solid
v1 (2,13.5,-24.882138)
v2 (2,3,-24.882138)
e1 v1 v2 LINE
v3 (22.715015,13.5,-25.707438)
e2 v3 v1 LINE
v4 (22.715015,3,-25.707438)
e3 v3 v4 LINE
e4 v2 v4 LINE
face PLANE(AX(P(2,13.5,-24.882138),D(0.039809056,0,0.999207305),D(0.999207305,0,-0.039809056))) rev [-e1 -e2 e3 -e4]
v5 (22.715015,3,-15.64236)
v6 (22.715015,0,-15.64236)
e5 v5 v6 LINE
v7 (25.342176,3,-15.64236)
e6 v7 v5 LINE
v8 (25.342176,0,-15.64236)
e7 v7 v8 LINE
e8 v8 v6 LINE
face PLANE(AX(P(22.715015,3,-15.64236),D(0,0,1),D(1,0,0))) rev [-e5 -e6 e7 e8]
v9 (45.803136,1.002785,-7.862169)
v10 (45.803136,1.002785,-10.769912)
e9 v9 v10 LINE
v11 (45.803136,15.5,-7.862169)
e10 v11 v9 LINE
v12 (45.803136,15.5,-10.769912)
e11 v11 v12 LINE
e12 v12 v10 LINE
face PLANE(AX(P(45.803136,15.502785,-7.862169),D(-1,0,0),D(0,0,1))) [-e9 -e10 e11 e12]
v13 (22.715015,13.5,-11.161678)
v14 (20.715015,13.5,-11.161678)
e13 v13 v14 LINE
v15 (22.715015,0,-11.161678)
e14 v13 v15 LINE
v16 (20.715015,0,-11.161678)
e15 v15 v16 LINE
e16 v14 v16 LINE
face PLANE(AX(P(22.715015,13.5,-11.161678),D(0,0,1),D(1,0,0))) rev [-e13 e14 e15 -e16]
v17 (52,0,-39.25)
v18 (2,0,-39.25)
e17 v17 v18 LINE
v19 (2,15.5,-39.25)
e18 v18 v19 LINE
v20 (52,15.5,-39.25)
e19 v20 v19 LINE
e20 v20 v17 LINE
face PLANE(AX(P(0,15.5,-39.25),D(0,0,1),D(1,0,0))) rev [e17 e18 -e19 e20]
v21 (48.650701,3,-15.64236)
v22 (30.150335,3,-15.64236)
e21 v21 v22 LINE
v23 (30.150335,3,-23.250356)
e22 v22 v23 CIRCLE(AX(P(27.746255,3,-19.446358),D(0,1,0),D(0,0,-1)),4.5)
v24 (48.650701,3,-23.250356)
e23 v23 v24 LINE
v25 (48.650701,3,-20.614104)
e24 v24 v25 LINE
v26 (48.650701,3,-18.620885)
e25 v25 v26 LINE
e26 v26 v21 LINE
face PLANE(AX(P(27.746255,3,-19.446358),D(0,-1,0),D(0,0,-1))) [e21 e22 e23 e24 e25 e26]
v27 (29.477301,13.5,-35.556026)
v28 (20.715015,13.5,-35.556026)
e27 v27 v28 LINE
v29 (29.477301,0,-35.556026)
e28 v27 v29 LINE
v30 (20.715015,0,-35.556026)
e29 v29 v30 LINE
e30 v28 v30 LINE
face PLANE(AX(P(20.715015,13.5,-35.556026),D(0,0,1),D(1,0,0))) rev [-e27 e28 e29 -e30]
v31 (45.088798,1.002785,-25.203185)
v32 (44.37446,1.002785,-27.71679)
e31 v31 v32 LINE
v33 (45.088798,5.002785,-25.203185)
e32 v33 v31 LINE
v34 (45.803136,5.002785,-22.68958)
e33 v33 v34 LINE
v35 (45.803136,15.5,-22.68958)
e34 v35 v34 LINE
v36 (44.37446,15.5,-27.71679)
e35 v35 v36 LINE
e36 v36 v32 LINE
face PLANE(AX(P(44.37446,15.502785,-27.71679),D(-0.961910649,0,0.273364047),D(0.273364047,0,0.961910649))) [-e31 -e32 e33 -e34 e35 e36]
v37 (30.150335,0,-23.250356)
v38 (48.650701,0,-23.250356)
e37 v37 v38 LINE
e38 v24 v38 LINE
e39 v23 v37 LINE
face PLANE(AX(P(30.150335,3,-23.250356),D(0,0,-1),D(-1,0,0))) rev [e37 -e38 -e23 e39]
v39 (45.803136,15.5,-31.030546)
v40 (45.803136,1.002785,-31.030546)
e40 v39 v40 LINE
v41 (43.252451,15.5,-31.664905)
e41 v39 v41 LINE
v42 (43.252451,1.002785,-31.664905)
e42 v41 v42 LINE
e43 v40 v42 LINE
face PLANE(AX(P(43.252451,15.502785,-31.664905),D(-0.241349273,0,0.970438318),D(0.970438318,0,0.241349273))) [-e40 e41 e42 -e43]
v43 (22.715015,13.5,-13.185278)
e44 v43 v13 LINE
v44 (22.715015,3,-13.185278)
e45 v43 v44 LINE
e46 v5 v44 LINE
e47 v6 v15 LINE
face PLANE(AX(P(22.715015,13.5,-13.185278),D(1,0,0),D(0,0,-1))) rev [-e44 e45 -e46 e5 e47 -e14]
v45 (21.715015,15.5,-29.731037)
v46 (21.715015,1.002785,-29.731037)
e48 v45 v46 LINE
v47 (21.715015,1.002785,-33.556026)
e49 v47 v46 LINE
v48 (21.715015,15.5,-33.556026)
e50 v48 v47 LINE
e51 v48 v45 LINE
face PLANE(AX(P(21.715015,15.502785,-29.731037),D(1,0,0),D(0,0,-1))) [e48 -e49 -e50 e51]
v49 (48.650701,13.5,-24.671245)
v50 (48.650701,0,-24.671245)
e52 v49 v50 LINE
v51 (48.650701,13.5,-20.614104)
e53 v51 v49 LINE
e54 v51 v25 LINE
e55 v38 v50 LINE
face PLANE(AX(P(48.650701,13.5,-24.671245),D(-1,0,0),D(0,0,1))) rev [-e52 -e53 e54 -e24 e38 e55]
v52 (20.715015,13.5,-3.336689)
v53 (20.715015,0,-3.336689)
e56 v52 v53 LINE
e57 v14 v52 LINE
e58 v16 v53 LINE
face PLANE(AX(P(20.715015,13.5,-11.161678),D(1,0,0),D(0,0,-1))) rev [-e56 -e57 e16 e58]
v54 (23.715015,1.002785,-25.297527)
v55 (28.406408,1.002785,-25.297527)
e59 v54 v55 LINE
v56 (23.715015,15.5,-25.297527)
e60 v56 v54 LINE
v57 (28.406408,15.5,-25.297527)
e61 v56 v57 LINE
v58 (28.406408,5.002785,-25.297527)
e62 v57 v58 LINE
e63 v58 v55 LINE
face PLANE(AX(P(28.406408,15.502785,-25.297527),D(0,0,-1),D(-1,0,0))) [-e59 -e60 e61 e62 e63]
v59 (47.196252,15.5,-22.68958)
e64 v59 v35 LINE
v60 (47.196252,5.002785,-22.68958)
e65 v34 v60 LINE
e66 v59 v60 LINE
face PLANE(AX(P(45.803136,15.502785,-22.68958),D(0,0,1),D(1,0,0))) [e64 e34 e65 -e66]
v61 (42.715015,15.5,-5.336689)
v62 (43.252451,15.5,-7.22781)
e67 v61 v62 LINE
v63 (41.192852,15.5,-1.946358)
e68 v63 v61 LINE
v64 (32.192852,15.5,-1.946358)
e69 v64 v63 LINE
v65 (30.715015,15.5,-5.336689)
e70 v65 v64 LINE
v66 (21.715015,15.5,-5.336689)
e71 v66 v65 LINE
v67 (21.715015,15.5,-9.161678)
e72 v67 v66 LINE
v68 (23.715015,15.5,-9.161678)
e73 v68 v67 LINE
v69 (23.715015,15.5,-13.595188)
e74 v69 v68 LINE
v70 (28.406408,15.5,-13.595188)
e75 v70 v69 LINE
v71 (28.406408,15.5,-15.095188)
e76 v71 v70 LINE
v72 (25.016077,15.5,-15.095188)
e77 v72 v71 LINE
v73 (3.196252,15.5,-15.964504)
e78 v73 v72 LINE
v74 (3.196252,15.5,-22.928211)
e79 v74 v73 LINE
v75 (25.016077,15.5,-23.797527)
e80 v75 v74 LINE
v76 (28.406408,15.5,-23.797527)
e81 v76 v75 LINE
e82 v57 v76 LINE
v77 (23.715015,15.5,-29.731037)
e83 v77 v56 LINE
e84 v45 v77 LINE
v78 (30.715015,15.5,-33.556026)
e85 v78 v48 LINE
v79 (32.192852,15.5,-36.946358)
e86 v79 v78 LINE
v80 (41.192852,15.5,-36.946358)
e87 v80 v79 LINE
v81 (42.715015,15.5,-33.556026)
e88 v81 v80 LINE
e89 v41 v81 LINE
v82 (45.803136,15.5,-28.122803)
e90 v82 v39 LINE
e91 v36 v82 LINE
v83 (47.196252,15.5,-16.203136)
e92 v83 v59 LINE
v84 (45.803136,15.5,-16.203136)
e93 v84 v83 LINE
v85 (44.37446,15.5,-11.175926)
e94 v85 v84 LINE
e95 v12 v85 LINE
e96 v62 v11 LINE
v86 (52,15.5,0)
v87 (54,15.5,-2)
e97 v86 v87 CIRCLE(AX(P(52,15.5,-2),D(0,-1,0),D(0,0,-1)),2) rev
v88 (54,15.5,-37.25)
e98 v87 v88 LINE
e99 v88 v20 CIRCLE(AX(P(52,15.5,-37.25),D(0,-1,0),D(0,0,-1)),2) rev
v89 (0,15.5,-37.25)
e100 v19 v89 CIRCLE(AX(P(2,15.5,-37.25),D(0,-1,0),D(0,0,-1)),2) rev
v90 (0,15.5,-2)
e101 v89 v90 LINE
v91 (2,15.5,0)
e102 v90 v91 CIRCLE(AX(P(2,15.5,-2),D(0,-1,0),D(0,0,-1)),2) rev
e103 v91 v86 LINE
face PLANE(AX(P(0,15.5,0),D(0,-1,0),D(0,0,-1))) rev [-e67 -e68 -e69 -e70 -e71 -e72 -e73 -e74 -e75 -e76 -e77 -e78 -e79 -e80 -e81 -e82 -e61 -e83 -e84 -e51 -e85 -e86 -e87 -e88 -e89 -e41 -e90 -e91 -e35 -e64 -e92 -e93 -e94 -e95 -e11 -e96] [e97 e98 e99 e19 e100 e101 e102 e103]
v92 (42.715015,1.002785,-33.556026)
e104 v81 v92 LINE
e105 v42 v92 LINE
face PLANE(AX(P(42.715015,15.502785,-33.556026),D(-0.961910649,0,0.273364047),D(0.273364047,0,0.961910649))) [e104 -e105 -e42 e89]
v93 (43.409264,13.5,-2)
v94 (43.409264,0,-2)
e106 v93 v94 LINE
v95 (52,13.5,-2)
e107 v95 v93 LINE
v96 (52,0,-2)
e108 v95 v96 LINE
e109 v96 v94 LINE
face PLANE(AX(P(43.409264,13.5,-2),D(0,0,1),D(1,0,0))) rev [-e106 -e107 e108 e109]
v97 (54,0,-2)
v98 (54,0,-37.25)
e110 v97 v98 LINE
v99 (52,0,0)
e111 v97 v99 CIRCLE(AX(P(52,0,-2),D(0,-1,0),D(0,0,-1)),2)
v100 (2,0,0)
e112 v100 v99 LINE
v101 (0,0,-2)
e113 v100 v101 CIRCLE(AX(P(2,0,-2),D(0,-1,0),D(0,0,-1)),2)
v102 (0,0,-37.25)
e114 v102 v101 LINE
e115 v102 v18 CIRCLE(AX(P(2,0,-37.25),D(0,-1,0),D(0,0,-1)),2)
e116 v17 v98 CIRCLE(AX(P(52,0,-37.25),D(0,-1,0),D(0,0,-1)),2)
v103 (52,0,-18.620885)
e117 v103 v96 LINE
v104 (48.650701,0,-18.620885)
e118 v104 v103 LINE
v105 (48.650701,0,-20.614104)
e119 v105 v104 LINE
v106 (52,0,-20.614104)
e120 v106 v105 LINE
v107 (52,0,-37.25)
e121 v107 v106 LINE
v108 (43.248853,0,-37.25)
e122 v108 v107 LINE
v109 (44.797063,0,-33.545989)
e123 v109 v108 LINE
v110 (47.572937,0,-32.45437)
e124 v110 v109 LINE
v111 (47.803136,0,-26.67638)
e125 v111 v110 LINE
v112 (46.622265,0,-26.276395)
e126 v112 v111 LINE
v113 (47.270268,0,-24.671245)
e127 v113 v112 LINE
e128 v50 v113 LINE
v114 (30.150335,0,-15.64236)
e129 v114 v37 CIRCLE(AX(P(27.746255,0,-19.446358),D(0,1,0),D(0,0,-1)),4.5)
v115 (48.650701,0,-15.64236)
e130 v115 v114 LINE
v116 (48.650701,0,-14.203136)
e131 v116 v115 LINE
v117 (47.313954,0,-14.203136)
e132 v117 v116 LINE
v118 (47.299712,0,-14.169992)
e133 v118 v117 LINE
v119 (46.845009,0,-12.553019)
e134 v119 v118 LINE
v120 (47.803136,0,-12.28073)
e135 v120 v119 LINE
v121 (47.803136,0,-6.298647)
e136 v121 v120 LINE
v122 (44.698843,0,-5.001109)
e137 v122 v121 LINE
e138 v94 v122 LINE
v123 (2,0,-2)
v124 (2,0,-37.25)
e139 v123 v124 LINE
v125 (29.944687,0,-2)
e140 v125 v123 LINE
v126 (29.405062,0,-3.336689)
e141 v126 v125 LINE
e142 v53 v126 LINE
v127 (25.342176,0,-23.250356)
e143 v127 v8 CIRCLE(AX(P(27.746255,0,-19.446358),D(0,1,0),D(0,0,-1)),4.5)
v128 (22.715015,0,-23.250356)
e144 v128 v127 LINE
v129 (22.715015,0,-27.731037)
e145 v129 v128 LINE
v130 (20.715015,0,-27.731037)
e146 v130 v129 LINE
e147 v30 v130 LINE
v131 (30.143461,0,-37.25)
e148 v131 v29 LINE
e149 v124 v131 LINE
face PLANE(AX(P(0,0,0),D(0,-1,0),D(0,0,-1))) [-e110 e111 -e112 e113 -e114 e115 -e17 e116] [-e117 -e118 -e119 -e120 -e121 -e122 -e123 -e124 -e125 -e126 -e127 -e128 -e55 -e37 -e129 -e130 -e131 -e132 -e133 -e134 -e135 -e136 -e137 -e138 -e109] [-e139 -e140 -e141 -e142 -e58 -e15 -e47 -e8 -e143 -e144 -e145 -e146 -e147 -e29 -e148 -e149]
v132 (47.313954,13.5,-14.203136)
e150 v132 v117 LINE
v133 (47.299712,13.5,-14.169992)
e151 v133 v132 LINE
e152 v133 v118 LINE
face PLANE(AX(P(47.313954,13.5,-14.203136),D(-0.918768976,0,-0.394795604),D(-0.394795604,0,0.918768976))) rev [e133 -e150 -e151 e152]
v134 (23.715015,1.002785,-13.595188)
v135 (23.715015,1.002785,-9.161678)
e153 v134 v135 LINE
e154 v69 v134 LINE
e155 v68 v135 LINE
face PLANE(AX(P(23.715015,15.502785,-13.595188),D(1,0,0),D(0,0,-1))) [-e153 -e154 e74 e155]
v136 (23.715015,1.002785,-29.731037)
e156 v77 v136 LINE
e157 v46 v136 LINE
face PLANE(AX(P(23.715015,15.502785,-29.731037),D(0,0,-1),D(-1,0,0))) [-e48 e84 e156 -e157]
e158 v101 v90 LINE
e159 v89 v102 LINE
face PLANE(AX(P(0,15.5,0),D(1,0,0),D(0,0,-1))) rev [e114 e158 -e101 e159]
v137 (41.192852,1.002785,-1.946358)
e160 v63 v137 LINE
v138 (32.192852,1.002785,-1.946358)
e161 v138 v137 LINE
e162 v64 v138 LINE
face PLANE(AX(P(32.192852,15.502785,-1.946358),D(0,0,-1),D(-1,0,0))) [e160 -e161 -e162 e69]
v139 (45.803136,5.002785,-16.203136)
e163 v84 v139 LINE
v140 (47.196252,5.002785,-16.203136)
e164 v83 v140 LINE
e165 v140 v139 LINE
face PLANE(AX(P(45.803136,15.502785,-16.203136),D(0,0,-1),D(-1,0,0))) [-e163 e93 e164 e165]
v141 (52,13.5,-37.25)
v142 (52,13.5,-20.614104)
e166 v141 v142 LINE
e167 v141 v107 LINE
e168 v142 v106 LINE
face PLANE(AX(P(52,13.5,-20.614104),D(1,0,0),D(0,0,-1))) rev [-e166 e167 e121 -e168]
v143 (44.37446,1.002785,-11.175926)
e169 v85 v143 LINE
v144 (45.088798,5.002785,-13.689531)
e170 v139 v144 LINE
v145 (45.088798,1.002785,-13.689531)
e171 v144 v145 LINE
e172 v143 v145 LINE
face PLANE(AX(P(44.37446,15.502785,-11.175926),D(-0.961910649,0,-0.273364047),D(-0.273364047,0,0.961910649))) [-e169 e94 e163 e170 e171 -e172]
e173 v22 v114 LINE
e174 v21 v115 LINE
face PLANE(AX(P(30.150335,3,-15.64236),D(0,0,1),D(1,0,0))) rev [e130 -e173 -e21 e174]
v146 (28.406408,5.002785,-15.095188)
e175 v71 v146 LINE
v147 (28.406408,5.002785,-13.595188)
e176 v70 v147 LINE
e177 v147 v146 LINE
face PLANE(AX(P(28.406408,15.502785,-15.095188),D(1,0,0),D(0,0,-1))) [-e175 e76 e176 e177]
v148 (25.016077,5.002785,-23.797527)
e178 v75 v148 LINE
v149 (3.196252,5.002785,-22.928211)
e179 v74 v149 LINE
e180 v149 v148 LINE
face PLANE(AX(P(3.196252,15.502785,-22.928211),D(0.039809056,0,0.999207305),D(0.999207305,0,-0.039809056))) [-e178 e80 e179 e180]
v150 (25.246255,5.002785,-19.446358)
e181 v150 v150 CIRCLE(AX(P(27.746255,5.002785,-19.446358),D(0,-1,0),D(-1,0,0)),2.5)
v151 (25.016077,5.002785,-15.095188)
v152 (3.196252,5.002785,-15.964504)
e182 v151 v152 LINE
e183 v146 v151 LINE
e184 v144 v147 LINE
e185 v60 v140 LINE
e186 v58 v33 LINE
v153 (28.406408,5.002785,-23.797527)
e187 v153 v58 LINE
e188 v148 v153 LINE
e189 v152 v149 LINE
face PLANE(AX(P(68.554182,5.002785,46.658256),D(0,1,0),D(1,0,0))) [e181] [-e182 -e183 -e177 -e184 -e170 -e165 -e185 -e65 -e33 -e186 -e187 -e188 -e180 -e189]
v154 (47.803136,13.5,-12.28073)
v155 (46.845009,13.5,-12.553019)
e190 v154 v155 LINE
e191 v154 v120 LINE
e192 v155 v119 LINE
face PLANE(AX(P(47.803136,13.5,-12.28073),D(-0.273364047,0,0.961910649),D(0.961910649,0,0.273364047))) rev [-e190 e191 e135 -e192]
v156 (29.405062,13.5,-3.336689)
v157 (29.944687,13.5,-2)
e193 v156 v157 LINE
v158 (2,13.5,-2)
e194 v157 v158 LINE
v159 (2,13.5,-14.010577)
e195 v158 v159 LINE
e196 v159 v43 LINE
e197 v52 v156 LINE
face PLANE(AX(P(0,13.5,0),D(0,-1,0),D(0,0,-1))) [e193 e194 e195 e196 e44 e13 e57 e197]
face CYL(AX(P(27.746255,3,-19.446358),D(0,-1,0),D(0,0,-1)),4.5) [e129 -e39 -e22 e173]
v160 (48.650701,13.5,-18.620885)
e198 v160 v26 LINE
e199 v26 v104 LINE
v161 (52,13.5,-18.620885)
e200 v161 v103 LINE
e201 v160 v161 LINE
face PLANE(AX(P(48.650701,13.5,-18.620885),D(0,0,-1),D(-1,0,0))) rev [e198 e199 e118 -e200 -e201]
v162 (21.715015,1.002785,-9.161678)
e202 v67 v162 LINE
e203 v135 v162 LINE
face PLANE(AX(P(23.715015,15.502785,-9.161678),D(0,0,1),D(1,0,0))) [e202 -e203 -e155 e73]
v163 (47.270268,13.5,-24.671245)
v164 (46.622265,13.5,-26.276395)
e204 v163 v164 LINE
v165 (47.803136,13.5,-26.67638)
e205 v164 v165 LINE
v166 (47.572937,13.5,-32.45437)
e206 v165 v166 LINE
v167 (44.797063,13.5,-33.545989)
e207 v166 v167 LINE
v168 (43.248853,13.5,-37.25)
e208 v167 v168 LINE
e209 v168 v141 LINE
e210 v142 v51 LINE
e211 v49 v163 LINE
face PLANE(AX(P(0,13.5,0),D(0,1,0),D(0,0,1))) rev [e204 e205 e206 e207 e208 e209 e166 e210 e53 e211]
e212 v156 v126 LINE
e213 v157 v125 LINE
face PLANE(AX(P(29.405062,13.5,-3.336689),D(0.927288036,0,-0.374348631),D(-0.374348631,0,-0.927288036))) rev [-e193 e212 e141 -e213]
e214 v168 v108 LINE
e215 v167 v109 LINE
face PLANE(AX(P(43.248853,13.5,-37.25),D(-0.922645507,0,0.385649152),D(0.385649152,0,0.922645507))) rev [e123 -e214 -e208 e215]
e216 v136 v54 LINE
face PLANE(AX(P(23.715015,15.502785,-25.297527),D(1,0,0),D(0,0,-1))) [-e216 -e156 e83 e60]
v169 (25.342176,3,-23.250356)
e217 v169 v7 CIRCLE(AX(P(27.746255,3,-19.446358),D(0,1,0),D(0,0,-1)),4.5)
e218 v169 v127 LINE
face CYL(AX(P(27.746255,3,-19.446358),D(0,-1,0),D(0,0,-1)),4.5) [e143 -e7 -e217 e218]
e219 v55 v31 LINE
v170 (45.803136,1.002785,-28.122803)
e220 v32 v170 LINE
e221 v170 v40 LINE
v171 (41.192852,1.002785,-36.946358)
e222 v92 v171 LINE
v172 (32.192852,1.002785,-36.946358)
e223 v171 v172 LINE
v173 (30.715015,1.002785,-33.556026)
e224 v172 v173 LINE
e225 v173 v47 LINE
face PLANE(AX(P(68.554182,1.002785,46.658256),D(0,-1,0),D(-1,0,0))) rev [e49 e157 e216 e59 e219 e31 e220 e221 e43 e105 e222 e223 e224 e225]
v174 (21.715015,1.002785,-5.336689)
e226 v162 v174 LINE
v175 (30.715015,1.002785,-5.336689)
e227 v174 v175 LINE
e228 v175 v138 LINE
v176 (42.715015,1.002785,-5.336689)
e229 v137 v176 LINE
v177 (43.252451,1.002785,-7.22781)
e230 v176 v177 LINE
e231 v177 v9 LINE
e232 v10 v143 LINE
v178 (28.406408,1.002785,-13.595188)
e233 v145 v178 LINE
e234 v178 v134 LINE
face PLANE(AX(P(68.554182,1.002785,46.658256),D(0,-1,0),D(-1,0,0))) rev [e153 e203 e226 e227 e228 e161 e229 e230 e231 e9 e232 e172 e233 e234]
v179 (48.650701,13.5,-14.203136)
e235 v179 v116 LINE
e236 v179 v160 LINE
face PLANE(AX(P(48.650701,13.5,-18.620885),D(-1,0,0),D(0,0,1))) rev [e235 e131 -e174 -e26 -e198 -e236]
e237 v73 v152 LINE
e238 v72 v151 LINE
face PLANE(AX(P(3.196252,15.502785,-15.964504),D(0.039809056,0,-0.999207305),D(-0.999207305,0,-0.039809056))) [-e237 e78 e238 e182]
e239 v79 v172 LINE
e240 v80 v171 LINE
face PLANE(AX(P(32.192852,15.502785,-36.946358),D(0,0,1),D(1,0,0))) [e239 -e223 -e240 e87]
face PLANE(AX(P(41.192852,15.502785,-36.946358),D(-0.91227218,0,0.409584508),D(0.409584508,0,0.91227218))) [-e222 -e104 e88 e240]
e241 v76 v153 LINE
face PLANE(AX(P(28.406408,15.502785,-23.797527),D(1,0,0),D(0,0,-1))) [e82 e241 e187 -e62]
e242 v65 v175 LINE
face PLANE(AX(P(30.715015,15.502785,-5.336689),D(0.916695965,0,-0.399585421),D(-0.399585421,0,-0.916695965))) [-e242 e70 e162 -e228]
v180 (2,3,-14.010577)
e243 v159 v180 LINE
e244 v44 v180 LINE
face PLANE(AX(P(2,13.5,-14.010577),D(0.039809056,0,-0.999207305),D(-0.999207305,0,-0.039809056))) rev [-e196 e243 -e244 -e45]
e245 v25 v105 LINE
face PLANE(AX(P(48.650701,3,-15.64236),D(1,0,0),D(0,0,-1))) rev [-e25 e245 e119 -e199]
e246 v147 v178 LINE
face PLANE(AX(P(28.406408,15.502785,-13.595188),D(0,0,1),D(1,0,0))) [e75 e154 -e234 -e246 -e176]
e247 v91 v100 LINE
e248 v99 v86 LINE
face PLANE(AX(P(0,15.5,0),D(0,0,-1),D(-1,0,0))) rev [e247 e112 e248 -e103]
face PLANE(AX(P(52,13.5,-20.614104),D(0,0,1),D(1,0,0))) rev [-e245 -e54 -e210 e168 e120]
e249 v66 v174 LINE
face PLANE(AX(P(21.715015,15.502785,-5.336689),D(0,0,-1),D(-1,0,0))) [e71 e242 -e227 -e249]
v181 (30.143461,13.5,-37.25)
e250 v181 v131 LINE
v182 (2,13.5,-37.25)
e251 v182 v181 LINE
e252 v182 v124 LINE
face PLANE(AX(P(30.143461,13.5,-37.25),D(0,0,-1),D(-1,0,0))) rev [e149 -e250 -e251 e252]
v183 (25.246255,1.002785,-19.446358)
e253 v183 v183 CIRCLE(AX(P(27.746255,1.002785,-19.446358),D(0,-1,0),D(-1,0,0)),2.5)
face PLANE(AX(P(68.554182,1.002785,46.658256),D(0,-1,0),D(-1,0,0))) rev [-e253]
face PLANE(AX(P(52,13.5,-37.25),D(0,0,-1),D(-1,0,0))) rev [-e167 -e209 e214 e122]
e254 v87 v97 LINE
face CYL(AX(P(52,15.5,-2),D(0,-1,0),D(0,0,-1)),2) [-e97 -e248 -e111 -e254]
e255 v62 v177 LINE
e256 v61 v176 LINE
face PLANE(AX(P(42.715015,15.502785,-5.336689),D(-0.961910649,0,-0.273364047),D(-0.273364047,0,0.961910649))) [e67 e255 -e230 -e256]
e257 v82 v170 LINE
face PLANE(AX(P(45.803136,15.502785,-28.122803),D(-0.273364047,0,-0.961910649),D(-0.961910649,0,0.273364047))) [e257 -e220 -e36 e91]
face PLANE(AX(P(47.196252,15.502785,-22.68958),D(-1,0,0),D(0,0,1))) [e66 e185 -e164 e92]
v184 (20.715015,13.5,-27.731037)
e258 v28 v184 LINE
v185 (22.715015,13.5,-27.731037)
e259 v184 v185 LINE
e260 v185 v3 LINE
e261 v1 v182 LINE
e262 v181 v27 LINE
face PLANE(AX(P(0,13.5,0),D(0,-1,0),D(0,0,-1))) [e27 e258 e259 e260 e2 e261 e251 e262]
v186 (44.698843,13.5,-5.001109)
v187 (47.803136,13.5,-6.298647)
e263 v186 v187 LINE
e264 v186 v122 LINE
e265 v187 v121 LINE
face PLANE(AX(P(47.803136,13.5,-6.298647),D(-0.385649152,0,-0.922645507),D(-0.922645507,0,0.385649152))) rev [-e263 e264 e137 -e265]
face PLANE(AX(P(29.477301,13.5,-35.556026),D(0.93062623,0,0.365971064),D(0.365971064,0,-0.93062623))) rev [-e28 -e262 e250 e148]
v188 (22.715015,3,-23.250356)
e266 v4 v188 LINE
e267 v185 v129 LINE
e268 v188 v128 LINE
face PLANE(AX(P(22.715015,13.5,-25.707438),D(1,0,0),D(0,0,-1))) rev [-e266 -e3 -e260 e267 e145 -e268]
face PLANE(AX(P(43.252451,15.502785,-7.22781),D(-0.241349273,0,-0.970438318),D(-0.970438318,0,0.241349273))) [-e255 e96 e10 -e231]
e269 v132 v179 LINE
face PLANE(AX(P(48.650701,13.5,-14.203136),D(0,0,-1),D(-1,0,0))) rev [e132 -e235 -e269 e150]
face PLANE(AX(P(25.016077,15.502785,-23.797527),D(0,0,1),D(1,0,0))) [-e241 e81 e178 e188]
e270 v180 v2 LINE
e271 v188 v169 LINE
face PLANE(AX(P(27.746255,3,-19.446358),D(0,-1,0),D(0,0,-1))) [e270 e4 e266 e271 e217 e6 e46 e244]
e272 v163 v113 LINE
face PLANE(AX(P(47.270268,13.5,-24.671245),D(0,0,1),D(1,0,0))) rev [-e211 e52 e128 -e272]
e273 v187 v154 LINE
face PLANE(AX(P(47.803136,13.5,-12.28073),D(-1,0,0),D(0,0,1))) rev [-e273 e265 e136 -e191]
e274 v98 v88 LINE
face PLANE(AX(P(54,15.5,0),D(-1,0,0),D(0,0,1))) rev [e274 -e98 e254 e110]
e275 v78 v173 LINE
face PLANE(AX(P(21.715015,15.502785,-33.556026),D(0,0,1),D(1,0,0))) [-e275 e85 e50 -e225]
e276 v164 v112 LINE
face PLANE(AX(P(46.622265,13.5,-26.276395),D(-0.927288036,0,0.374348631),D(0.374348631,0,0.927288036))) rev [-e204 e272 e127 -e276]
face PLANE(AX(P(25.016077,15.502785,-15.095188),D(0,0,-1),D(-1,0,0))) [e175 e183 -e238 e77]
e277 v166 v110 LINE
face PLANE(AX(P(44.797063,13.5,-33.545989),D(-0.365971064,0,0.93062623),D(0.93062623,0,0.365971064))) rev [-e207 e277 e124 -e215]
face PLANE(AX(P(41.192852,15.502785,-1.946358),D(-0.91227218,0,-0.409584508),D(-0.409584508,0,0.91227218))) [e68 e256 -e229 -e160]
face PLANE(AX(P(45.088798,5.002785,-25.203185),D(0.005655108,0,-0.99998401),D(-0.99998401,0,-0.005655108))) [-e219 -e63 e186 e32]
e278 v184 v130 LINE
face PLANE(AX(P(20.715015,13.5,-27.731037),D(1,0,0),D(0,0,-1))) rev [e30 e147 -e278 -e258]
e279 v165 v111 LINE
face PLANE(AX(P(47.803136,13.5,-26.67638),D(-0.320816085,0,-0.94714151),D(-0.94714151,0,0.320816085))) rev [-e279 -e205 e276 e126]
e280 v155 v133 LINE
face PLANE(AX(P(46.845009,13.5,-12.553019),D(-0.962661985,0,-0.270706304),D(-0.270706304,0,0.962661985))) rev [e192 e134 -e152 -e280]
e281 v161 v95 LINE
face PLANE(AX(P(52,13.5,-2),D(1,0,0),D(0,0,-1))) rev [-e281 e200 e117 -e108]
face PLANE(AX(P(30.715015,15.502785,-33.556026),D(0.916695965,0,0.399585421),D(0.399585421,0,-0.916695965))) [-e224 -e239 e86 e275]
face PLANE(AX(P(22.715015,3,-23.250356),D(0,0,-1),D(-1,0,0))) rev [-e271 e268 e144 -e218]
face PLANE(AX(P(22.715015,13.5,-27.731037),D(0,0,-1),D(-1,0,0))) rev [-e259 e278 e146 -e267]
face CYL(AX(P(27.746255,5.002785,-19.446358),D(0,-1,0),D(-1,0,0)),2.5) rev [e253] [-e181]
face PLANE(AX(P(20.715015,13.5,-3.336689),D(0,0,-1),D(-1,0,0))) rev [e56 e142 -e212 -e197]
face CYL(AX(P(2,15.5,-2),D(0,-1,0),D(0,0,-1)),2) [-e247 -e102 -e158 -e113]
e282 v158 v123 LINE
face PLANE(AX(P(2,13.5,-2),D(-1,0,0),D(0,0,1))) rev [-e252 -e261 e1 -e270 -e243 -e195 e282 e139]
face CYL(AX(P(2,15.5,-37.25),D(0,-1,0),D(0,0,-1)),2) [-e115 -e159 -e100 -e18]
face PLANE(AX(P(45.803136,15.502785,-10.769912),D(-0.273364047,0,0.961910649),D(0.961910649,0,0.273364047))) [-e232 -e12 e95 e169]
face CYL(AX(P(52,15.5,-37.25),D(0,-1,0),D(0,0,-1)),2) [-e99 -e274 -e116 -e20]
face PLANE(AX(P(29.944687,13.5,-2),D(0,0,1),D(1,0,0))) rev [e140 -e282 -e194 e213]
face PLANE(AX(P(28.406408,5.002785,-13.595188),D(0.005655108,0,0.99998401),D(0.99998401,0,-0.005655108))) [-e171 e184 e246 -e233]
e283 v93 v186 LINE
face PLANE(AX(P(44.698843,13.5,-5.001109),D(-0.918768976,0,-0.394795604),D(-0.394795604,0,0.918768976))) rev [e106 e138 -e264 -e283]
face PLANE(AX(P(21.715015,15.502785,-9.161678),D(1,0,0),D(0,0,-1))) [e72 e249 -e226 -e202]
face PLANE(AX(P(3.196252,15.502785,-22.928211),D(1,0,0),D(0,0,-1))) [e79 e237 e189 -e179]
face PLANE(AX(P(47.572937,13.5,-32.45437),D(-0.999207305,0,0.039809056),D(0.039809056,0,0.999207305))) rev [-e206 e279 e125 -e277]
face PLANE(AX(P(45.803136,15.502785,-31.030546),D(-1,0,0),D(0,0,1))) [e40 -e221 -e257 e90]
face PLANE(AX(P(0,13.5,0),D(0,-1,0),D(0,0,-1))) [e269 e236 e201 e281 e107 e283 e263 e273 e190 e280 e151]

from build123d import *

# Parameters (mm, degrees)
SKETCH1_W                = 54
SKETCH1_H                = 39.25
BOSS_EXTRUDE1_DEPTH      = 15.5
FILLET1_R                = 2
FILLET2_R                = 2
E_WING_START             = 8.464149768
E_WING_BLANK_DEPTH       = 10.5
E_WING_START_2           = 4.464149768
E_WING_BLANK_2_OUTLINE_R = 2.5
E_WING_BLANK_2_DEPTH     = 4
BODY_MOVE_COPY5_ANGLE    = 90
CUT_EXTRUDE1_DEPTH       = 13.5
CUT_EXTRUDE2_DEPTH       = 3


with BuildPart() as part:
    # Sketch1 → Boss-Extrude1 (new body)
    with BuildSketch(Plane(origin=(0, 0, 0), x_dir=(1, 0, 0), z_dir=(0, 1, 0))):
        with Locations((27, 19.625)):
            Rectangle(SKETCH1_W, SKETCH1_H)
    extrude(amount=BOSS_EXTRUDE1_DEPTH)

    # Fillet1
    fillet1_edges = [part.edges().sort_by_distance(p)[0] for p in [
        (0, 7.75, 0),
    ]]
    fillet(fillet1_edges, radius=FILLET1_R)

    # Fillet2
    fillet2_edges = [part.edges().sort_by_distance(p)[0] for p in [
        (0, 7.75, -39.25),
        (54, 7.75, -39.25),
        (54, 7.75, 0),
    ]]
    fillet(fillet2_edges, radius=FILLET2_R)


with BuildPart() as body_2:
    # E-Wing Blank: read off the stored shape, not the designer's step
    # E-Wing Blank outline → E-Wing Blank (new body)
    with BuildSketch(Plane(origin=(0, 0, 0), x_dir=(1, 0, 0), z_dir=(0, 1, 0)).offset(E_WING_START)):
        Polygon((76.333039674, 32.997673143), (76.333039674, 31.604556958), (82.819483769, 31.604556958), (82.819483769, 32.997673143), (87.846693693, 34.426348928), (88.252707074, 32.997673143), (91.160450403, 32.997673143), (91.794809137, 35.548358356), (93.685930379, 36.085793467), (97.076261721, 37.607956728), (97.076261721, 46.607956728), (93.685930379, 48.085793467), (93.685930379, 57.085793467), (89.860941172, 57.085793467), (89.860941172, 55.085793467), (85.427430955, 55.085793467), (85.427430955, 50.394400823), (83.927430955, 50.394400823), (83.927430955, 53.784732166), (83.058115227, 75.604556958), (76.094408216, 75.604556958), (75.225092487, 53.784732166), (75.225092487, 50.394400823), (73.725092487, 50.394400823), (73.725092487, 55.085793467), (69.29158227, 55.085793467), (69.29158227, 57.085793467), (65.466593064, 57.085793467), (65.466593064, 48.085793467), (62.076261721, 46.607956728), (62.076261721, 37.607956728), (65.466593064, 36.085793467), (67.357714306, 35.548358356), (67.99207304, 32.997673143), (70.899816369, 32.997673143), (71.30582975, 34.426348928), align=None)
    extrude(amount=E_WING_BLANK_DEPTH)

    # E-Wing Blank 2 outline → E-Wing Blank 2 (add)
    with BuildSketch(Plane(origin=(0, 0, 0), x_dir=(1, 0, 0), z_dir=(0, 1, 0)).offset(E_WING_START_2)):
        Polygon((71.30582975, 34.426348928), (73.819434712, 33.712011036), (73.725092487, 50.394400823), (73.725092487, 55.085793467), (69.29158227, 55.085793467), (69.29158227, 57.085793467), (65.466593064, 57.085793467), (65.466593064, 48.085793467), (62.076261721, 46.607956728), (62.076261721, 37.607956728), (65.466593064, 36.085793467), (67.357714306, 35.548358356), (67.99207304, 32.997673143), (70.899816369, 32.997673143), align=None)
        Polygon((85.427430955, 50.394400823), (85.333088731, 33.712011036), (87.846693693, 34.426348928), (88.252707074, 32.997673143), (91.160450403, 32.997673143), (91.794809137, 35.548358356), (93.685930379, 36.085793467), (97.076261721, 37.607956728), (97.076261721, 46.607956728), (93.685930379, 48.085793467), (93.685930379, 57.085793467), (89.860941172, 57.085793467), (89.860941172, 55.085793467), (85.427430955, 55.085793467), align=None)
        with Locations((79.576261721, 51.054553675)):
            Circle(E_WING_BLANK_2_OUTLINE_R)
    extrude(amount=E_WING_BLANK_2_DEPTH)


with BuildPart() as body_2_1:
    # Body-Move/Copy3: moved
    add(body_2.part.moved(Location((0, -2.941364734, 30.286723837))))


with BuildPart() as body_2_2:
    # Body-Move/Copy4: moved
    add(body_2_1.part.moved(Location((-54.380009777, 0, 0))))


with BuildPart() as body_2_3:
    # Body-Move/Copy5: moved
    add(body_2_2.part.rotate(Axis((25.196251944, 0, -23.317833121), (0, 1, 0)), BODY_MOVE_COPY5_ANGLE))


with BuildPart() as body_2_4:
    # Body-Move/Copy6: moved
    add(body_2_3.part.moved(Location((0, 0, 3.871475448))))


with BuildPart() as body_2_5:
    # Body-Move/Copy8: moved
    add(body_2_4.part.moved(Location((0, -0.52, 0))))


with BuildPart() as part_1:
    add(part.part)

    # Intersect1: read off the stored shape, not the designer's step
    # Intersect1: cut body 2
    add(body_2_5.part, mode=Mode.SUBTRACT)

    # Sketch3 → Cut-Extrude1 (cut)
    with BuildSketch(Plane(origin=(0, 0, 0), x_dir=(-1, 0, 0), z_dir=(0, -1, 0))):
        Polygon((-2, 2), (-2, 14.010576961), (-22.715015436, 13.185277541), (-22.715015436, 11.161678222), (-20.715015436, 11.161678222), (-20.715015436, 3.336689015), (-29.405061858, 3.336689015), (-29.944686746, 2), align=None)
        Polygon((-2, 24.882138385), (-22.715015436, 25.707437805), (-22.715015436, 27.731037124), (-20.715015436, 27.731037124), (-20.715015436, 35.556026331), (-29.477301308, 35.556026331), (-30.143460637, 37.25), (-2, 37.25), align=None)
        Polygon((-43.248853496, 37.25), (-44.797063028, 33.545989344), (-47.572936951, 32.454370068), (-47.80313576, 26.676379962), (-46.622265015, 26.276395033), (-47.270268456, 24.671244676), (-48.650700904, 24.671244676), (-48.650700904, 20.614103613), (-52, 20.614103613), (-52, 37.25), align=None)
        Polygon((-48.650700904, 14.203135625), (-47.31395374, 14.203135625), (-47.2997118, 14.169991759), (-46.845009369, 12.553018905), (-47.80313576, 12.280730301), (-47.80313576, 6.298647203), (-44.698842535, 5.001108722), (-43.40926424, 2), (-52, 2), (-52, 18.620885492), (-48.650700904, 18.620885492), align=None)
    extrude(amount=-CUT_EXTRUDE1_DEPTH, mode=Mode.SUBTRACT)

    # Sketch4 → Cut-Extrude2 (cut)
    with BuildSketch(Plane.XZ):
        with BuildLine():
            Line((2, -14.010576961), (2, -24.882138385))
            Line((2, -24.882138385), (22.715015436, -25.707437805))
            Line((22.715015436, -25.707437805), (22.715015436, -23.250355795))
            Line((22.715015436, -23.250355795), (25.342175719, -23.250355795))
            ThreePointArc((25.342175719, -23.250355795), (23.246255228, -19.446357673), (25.342175719, -15.642359551))
            Line((25.342175719, -15.642359551), (22.715015436, -15.642359551))
            Line((22.715015436, -15.642359551), (22.715015436, -13.185277541))
            Line((22.715015436, -13.185277541), (2, -14.010576961))
        make_face()
        with BuildLine():
            Line((48.650700904, -23.250355795), (48.650700904, -20.614103613))
            Line((48.650700904, -20.614103613), (48.650700904, -18.620885492))
            Line((48.650700904, -18.620885492), (48.650700904, -15.642359551))
            Line((48.650700904, -15.642359551), (30.150334738, -15.642359551))
            ThreePointArc((30.150334738, -15.642359551), (32.246255228, -19.446357673), (30.150334738, -23.250355795))
            Line((30.150334738, -23.250355795), (48.650700904, -23.250355795))
        make_face()
    extrude(amount=-CUT_EXTRUDE2_DEPTH, mode=Mode.SUBTRACT)


solid = part_1.part
